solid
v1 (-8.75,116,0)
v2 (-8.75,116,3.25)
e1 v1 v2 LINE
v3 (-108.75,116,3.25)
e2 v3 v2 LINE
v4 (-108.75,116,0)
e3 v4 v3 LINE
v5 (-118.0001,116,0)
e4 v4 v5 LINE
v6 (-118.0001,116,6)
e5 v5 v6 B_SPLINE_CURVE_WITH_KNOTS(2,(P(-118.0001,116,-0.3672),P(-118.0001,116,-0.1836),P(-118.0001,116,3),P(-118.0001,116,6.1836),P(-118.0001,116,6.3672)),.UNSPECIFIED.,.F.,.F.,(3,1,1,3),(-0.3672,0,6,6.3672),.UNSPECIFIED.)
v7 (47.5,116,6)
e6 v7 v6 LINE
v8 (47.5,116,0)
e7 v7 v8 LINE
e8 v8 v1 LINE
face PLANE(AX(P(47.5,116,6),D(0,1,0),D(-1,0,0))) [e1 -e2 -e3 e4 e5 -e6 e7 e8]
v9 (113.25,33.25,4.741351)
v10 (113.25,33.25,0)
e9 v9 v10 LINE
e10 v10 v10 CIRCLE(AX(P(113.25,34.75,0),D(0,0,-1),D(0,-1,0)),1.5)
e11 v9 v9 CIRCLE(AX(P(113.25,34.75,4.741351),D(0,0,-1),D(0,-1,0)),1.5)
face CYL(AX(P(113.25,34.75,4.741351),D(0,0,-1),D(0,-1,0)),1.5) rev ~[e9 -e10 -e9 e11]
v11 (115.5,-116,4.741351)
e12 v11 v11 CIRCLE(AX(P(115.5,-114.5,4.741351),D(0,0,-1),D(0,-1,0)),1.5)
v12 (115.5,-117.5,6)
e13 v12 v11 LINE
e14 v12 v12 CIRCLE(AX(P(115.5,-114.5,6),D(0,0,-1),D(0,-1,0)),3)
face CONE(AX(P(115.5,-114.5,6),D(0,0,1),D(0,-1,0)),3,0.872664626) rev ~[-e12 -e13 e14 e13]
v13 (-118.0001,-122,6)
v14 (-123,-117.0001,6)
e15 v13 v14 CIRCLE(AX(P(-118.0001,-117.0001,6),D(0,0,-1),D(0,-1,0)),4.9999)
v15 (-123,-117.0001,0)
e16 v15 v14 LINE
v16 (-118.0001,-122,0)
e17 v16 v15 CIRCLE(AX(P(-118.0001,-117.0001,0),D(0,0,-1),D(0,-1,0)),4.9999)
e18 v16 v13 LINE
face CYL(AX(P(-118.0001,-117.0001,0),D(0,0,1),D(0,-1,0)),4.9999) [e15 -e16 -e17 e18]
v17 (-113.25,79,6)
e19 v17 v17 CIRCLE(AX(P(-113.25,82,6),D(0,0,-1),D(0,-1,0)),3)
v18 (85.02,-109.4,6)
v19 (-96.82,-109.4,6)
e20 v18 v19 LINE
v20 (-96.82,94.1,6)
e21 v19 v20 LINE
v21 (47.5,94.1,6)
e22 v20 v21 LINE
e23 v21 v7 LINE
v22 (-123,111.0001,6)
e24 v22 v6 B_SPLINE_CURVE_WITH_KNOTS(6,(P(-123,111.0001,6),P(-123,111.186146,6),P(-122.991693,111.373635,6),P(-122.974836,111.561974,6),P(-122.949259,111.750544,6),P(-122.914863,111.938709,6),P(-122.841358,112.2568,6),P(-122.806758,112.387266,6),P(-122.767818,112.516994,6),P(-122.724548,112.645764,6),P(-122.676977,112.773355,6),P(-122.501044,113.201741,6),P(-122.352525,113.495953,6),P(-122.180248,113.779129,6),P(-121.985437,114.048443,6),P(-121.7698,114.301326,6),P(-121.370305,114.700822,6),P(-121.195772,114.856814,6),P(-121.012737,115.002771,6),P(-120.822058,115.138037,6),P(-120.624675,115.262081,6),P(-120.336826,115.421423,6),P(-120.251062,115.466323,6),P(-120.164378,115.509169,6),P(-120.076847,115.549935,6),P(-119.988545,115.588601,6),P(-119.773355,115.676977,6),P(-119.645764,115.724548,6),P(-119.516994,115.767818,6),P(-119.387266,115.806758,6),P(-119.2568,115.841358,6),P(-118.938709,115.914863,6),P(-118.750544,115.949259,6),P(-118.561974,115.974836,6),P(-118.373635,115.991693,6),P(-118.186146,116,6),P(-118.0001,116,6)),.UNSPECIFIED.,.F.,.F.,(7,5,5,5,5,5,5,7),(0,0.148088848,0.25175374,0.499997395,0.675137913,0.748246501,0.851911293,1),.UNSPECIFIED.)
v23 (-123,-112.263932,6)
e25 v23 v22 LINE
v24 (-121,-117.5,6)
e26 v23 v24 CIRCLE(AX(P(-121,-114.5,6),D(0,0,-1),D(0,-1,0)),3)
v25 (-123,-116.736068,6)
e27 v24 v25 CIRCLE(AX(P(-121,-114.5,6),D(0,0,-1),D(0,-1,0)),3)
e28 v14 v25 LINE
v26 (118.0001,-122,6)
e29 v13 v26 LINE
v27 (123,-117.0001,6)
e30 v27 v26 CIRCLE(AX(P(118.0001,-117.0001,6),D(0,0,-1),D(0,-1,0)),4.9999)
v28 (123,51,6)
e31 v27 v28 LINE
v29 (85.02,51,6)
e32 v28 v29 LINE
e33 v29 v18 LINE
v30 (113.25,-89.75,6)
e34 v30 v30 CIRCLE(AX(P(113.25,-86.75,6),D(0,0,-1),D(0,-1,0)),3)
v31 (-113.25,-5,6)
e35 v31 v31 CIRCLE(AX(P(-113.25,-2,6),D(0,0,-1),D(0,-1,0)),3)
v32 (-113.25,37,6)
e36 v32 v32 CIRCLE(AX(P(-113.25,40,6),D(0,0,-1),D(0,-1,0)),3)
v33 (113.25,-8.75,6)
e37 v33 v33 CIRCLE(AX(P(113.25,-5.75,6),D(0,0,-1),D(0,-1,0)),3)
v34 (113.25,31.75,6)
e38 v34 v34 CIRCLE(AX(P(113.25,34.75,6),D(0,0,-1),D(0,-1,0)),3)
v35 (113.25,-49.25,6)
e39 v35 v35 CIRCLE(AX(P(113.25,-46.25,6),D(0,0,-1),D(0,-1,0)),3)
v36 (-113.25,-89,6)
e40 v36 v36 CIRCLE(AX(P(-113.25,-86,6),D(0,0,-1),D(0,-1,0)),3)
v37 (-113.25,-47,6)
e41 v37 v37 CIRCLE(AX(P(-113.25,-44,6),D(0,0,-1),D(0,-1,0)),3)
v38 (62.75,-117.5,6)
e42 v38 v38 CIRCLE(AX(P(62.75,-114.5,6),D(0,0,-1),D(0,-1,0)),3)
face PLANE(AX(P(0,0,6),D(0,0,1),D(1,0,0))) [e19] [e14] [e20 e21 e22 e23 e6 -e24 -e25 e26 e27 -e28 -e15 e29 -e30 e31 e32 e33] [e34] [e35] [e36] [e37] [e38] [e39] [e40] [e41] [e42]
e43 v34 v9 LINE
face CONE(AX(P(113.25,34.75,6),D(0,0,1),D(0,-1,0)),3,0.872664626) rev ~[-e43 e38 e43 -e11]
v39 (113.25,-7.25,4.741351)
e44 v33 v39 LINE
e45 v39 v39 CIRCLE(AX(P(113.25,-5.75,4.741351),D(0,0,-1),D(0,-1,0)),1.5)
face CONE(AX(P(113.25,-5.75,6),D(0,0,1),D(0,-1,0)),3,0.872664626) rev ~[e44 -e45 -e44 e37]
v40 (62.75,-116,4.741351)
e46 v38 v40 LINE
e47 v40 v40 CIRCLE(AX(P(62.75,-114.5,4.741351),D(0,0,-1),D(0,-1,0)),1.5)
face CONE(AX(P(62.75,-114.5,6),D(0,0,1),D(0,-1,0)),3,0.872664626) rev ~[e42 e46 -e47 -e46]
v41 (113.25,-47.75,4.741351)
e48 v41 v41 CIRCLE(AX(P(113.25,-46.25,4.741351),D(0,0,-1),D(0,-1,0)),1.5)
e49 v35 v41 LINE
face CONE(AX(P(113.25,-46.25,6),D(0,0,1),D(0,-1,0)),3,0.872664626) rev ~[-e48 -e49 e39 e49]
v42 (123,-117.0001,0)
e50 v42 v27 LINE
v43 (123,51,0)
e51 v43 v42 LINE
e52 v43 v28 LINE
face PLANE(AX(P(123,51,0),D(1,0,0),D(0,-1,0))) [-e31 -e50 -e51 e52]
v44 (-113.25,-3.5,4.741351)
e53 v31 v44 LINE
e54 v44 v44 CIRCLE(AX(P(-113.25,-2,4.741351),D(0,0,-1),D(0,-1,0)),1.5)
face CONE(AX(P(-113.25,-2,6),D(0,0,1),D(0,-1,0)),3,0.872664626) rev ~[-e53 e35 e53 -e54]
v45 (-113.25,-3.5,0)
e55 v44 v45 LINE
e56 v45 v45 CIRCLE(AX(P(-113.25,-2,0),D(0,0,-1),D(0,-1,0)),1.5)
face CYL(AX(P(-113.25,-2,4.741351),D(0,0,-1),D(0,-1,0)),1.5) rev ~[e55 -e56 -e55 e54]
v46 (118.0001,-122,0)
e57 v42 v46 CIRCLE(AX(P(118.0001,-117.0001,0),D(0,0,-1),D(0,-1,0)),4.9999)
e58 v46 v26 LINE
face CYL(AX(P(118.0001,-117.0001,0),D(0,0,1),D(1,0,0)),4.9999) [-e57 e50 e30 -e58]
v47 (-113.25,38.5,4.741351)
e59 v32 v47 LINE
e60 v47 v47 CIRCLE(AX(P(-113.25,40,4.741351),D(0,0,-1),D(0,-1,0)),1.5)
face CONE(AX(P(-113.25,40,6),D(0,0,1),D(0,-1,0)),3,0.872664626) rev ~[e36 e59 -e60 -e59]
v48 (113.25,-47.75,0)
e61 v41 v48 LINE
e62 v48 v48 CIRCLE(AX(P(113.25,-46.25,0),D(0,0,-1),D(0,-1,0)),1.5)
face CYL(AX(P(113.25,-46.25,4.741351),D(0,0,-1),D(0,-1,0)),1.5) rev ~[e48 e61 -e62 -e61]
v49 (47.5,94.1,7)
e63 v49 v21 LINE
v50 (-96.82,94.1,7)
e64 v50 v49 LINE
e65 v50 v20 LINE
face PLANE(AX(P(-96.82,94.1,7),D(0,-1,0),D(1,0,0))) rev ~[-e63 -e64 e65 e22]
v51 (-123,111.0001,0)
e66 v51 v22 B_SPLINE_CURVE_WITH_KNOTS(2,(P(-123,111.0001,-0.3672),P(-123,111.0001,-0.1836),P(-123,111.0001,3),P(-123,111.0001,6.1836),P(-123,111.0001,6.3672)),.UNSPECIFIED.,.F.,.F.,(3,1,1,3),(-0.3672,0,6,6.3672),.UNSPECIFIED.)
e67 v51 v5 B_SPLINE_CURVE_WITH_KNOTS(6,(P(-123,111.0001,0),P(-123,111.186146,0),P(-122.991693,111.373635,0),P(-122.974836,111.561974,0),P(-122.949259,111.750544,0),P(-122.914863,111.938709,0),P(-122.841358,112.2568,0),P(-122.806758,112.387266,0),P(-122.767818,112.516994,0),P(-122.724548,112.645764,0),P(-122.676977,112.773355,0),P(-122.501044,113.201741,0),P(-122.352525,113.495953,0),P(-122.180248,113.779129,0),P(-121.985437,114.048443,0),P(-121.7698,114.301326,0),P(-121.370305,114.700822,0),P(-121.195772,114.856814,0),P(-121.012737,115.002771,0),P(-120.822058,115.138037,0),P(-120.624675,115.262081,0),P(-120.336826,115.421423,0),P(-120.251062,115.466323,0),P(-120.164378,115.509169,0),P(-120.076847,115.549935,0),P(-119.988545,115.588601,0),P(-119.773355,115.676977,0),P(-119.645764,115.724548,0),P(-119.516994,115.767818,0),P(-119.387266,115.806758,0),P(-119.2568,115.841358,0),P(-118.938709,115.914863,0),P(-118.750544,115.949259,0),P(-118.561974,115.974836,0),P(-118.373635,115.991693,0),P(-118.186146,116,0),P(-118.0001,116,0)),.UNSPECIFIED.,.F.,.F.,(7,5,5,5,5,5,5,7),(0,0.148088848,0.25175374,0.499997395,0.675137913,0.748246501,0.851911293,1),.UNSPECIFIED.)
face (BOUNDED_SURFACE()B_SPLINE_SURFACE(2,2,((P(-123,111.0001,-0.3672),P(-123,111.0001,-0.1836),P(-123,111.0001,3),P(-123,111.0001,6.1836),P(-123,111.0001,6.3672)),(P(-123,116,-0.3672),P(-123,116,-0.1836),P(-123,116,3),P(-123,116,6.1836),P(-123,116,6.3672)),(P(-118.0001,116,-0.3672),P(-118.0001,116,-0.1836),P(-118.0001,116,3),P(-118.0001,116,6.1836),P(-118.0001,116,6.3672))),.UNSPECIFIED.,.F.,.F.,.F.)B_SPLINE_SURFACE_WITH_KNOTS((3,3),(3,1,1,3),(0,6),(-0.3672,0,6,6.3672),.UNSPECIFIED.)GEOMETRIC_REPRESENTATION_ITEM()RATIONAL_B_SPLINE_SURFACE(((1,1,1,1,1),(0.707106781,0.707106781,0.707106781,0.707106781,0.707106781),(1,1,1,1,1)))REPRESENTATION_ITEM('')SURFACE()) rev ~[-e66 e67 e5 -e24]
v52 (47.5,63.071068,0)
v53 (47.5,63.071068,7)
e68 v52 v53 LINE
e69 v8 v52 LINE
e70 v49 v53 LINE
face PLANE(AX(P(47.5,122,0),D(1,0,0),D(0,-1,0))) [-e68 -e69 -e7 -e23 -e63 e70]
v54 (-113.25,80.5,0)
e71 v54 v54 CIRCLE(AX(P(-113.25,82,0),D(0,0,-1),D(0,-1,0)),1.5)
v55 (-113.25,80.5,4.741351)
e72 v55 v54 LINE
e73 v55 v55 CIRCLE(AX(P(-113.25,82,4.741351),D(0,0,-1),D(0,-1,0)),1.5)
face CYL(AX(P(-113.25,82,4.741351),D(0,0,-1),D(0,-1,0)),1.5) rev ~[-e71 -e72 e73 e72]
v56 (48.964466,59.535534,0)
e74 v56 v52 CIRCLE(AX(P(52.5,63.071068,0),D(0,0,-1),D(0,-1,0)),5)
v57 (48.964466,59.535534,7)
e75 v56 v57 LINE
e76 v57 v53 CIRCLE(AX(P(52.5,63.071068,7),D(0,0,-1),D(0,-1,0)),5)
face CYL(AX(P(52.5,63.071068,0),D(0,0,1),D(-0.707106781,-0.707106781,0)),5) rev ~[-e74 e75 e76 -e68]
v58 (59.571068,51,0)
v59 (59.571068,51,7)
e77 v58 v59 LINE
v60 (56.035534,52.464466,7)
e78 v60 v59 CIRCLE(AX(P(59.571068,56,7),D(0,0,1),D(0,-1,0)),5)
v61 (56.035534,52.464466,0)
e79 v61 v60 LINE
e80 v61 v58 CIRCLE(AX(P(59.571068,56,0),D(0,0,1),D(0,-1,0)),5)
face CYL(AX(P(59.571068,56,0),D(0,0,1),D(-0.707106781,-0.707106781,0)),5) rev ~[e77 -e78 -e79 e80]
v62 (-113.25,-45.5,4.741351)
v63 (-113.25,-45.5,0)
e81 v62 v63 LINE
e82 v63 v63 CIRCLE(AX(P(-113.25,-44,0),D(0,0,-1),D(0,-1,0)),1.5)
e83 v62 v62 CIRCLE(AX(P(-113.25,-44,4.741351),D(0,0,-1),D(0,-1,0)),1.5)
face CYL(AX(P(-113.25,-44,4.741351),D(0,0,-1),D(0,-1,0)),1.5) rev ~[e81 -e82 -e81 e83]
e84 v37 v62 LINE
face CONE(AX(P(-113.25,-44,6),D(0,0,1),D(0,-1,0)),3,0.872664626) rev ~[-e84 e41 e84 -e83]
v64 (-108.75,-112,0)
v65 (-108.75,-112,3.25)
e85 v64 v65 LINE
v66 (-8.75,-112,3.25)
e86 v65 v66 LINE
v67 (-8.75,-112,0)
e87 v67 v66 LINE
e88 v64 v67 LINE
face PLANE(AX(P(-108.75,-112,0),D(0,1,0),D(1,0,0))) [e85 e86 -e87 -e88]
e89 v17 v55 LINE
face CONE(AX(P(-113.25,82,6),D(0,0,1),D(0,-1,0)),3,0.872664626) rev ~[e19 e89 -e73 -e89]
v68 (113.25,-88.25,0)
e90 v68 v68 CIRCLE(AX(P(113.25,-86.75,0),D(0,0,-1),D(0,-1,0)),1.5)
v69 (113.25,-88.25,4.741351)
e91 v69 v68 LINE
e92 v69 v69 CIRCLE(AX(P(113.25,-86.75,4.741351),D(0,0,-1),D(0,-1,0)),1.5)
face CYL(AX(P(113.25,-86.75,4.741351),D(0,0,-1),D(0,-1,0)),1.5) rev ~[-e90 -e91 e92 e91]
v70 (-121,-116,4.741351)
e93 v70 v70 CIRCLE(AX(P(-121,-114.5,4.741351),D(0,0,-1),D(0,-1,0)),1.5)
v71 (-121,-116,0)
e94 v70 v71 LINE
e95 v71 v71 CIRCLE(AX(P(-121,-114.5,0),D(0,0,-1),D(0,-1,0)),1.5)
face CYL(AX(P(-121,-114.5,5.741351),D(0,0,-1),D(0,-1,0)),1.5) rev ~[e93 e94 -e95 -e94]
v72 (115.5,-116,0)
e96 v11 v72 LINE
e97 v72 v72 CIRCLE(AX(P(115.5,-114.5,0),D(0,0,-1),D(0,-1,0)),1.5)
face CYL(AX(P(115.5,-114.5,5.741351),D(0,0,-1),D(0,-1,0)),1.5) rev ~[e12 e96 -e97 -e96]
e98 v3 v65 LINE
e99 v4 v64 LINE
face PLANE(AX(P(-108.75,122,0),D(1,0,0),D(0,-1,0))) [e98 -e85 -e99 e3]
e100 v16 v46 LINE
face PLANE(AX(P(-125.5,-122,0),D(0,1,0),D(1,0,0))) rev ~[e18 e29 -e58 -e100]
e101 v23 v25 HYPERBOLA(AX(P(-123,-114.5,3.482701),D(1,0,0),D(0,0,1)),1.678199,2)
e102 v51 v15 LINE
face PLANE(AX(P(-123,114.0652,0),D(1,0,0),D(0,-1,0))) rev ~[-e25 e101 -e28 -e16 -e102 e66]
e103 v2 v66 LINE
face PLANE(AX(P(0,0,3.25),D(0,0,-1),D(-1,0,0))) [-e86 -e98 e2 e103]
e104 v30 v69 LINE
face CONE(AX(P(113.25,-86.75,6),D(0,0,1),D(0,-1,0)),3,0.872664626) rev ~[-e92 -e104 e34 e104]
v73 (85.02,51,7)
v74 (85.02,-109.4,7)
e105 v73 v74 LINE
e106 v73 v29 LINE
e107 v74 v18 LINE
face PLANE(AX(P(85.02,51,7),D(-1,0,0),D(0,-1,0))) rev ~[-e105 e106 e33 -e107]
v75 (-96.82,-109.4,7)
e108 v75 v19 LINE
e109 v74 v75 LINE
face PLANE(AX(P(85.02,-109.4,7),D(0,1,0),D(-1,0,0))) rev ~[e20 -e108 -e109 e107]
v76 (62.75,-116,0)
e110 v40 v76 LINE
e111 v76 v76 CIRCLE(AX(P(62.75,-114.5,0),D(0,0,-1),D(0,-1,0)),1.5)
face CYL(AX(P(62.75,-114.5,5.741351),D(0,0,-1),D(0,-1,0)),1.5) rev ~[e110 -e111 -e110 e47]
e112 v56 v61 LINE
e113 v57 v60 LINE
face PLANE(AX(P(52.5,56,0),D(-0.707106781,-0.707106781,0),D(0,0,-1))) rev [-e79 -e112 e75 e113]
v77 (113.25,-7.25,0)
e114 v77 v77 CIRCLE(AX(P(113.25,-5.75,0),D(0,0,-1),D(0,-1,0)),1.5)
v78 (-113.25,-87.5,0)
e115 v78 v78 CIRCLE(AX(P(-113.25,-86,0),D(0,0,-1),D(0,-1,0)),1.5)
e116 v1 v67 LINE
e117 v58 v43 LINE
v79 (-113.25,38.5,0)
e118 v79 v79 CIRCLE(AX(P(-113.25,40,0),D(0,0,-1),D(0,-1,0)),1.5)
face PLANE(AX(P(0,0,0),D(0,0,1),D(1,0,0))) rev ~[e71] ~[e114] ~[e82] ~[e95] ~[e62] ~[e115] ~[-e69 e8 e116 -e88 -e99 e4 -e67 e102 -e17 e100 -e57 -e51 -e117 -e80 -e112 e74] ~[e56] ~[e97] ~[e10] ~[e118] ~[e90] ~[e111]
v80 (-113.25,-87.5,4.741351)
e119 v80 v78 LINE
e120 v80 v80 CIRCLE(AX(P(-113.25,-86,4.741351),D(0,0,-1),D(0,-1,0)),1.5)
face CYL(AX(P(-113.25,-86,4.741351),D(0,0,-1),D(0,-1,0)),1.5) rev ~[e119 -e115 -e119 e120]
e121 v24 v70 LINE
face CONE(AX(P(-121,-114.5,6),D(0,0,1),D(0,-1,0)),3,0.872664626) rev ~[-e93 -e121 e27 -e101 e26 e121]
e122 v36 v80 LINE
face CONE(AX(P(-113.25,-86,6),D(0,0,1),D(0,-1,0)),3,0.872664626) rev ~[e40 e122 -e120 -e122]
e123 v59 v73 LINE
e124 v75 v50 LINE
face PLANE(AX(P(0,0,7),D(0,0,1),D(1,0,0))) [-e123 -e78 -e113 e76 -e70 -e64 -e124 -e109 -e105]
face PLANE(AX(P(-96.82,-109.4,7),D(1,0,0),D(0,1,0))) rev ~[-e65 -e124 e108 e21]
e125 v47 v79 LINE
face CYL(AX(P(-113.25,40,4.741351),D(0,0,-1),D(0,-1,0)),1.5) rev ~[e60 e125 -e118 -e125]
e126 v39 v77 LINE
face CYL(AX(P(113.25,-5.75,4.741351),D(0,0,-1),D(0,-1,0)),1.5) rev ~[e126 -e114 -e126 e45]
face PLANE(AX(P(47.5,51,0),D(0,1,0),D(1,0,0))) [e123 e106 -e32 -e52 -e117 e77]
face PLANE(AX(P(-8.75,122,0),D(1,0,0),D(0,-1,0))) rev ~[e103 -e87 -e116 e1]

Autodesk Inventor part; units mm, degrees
ref_plane "YZ Plane" through (0, 0, 0) normal (1, 0, 0) x (0, 1, 0)
ref_plane "XZ Plane" through (0, 0, 0) normal (0, 1, 0) x (-1, 0, 0)
ref_plane "XY Plane" through (0, 0, 0) normal (0, 0, 1) x (1, 0, 0)
sketch "Sketch1" plane through (0, 0, 0) normal (0, 0, 1) x (1, 0, 0)
  line L0 (-125.5, -122) -> (125.5, -122)
  line L1 (125.5, -122) -> (125.5, 122)
  line L2 (125.5, 122) -> (-125.5, 122)
  line L3 (-125.5, 122) -> (-125.5, -122)
  line L4 (-125.5, -122) -> (125.5, 122) construction
  line L5 (125.5, -122) -> (-125.5, 122) construction
  line L6 (125.5, 122) -> (47.5, 122)
  line L7 (47.5, 122) -> (47.5, 51)
  line L8 (47.5, 51) -> (125.5, 51)
  line L9 (125.5, 51) -> (125.5, 122)
  point P0 (0, 0)
  point P1 (125.5, 51)
  dimension "d0" = 251
  dimension "d1" = 244
  dimension "d6" = 78
  dimension "d7" = 71
extrude "Extrusion1" add sketch "Sketch1" along normal blind 7 contours L3 L2 L7 L8 L1 L0
sketch "Sketch2" plane through (0, 0, 7) normal (0, 0, 1) x (1, 0, 0)
  line L0 (-100, -100) -> (100, -100)
  line L1 (100, -100) -> (100, 100)
  line L2 (100, 100) -> (-100, 100)
  line L3 (-100, 100) -> (-100, -100)
  line L4 (-100, -100) -> (100, 100) construction
  line L5 (100, -100) -> (-100, 100) construction
  point P0 (0, 0)
  point P1 (0, 0)
  dimension "d4" = 200
  dimension "d5" = 200
sketch "Sketch3" plane through (0, 0, 7) normal (0, 0, 1) x (1, 0, 0)
  line L0 (-85.5721, 144.9839) -> (-125.5, 112)
  line L1 (-125.5, 122) -> (-125.5, -122) projected
  line L2 (-85.5721, 144.9839) -> (-17.6358, 144.9839) construction
  line L3 (125.5, -122) -> (125.5, 51) projected
  line L4 (125.5, 51) -> (47.5, 51) projected
  line L5 (47.5, 51) -> (47.5, 122) projected
  line L6 (47.5, 122) -> (-125.5, 122) projected
  line L7 (-125.5, 122) -> (-125.5, -122) projected
  line L8 (-125.5, -122) -> (125.5, -122) projected
  point P0 (0, 0)
  point P1 (-113.3947, 122)
  point P2 (-125.5, 122)
  dimension "d9" = 140.44
  dimension "d10" = 10
extrude "Extrusion2" cut sketch "Sketch3" against normal blind 10 contours L0 L1 L6
fillet "Fillet1" radius 5 2 edges at (-113.3947, 122, 3.5) (-125.5, 112, 3.5)
chamfer "Chamfer1" distance 10 angle 45 1 edges at (47.5, 51, 3.5)
sketch "Sketch4" plane through (0, 0, 7) normal (0, 0, 1) x (1, 0, 0)
  line L0 (-125.5, 109.645) -> (-125.5, -122) projected
  line L1 (125.5, -122) -> (125.5, 51) projected
  line L2 (-125.5, -122) -> (125.5, -122) projected
  point P0 (0, 0)
  point P1 (-121, -114.5)
  point P2 (115.5, -114.5)
  point P3 (10, -114.5)
  point P4 (62.75, -114.5)
  dimension "d17" = 4.5
  dimension "d20" = 10
  dimension "d21" = 7.5
  dimension "d42" = 52.75
  dimension "d43" = 52.75
hole "Hole1" at (-121, -114.5, 7) at (115.5, -114.5, 7) at (62.75, -114.5, 7) direction (0, 0, -1) diameter 3 depth 15 countersink diameter 6 countersink angle 100
sketch "Sketch5" plane through (0, 0, 7) normal (0, 0, 1) x (1, 0, 0)
  line L0 (-96.82, 94.1) -> (85.02, 94.1)
  line L1 (85.02, 94.1) -> (85.02, -109.4)
  line L2 (85.02, -109.4) -> (-96.82, -109.4)
  line L3 (-96.82, -109.4) -> (-96.82, 94.1)
  line L4 (125.5, -122) -> (125.5, 51) projected
  line L5 (-125.5, 109.645) -> (-125.5, -122) projected
  line L6 (47.5, 122) -> (-111.5966, 122) projected
  line L7 (-125.5, -122) -> (125.5, -122) projected
  circle A0 centre (115.5, -114.5) radius 3 projected
  circle A1 centre (-121, -114.5) radius 3 projected
  arc A2 (-123.6844, 113.4998) -> (-125.5, 109.645) centre (-120.5, 109.645) ccw projected
  line L8 (-125.5, 109.645) -> (-125.5, -122) projected
  line L9 (-125.5, -122) -> (125.5, -122) projected
  line L10 (125.5, -122) -> (125.5, 51) projected
  line L11 (125.5, 51) -> (57.5, 51) projected
  line L12 (47.5, 61) -> (57.5, 51) projected
  line L13 (47.5, 61) -> (47.5, 122) projected
  line L14 (47.5, 122) -> (-111.5966, 122) projected
  arc A3 (-111.5966, 122) -> (-114.781, 120.8548) centre (-111.5966, 117) ccw projected
  line L15 (-114.781, 120.8548) -> (-123.6844, 113.4998) projected
  point P0 (0, 0)
  point P1 (47.5, 94.1)
  point P2 (-111.5966, 122)
  point P3 (85.02, 51)
  dimension "d29" = 40.48
  dimension "d30" = 28.68
  dimension "d31" = 27.9
  dimension "d32" = 12.6
extrude "Extrusion3" cut sketch "Sketch5" against normal blind 1 contours L3 L2 L1 L11 L4 L7 L5 A2 L15 A3 L6 L13 L0 | A0 | A1
sketch "Sketch6" plane through (0, 0, 6) normal (0, 0, 1) x (1, 0, 0)
  circle A0 centre (115.5, -114.5) radius 1.8082 projected
  circle A1 centre (-121, -114.5) radius 1.8082 projected
  line L0 (47.5, 94.1) -> (-96.82, 94.1) projected
  line L1 (47.5, 122) -> (47.5, 94.1) projected
  line L2 (-111.5966, 122) -> (47.5, 122) projected
  arc A2 (-111.5966, 122) -> (-114.781, 120.8548) centre (-111.5966, 117) ccw projected
  line L3 (-123.6844, 113.4998) -> (-114.781, 120.8548) projected
  arc A3 (-123.6844, 113.4998) -> (-125.5, 109.645) centre (-120.5, 109.645) ccw projected
  line L4 (-125.5, -122) -> (-125.5, 109.645) projected
  line L5 (125.5, -122) -> (-125.5, -122) projected
  line L6 (125.5, 51) -> (125.5, -122) projected
  line L7 (85.02, 51) -> (125.5, 51) projected
  line L8 (85.02, -109.4) -> (85.02, 51) projected
  line L9 (-96.82, -109.4) -> (85.02, -109.4) projected
  line L10 (-96.82, 94.1) -> (-96.82, -109.4) projected
  circle A4 centre (62.75, -114.5) radius 1.8082 projected
  circle A5 centre (115.5, -114.5) radius 1.8082 projected
  circle A6 centre (-121, -114.5) radius 1.8082 projected
  line L11 (47.5, 94.1) -> (-96.82, 94.1) projected
  line L12 (47.5, 122) -> (47.5, 94.1) projected
  line L13 (-111.5966, 122) -> (47.5, 122) projected
  arc A7 (-111.5966, 122) -> (-114.781, 120.8548) centre (-111.5966, 117) ccw projected
  line L14 (-123.6844, 113.4998) -> (-114.781, 120.8548) projected
  arc A8 (-123.6844, 113.4998) -> (-125.5, 109.645) centre (-120.5, 109.645) ccw projected
  line L15 (-125.5, -122) -> (-125.5, 109.645) projected
  line L16 (125.5, -122) -> (-125.5, -122) projected
  line L17 (125.5, 51) -> (125.5, -122) projected
  line L18 (85.02, 51) -> (125.5, 51) projected
  line L19 (85.02, -109.4) -> (85.02, 51) projected
  line L20 (-96.82, -109.4) -> (85.02, -109.4) projected
  line L21 (-96.82, 94.1) -> (-96.82, -109.4) projected
  point P0 (0, 0)
hole "Hole2" at (-121, -114.5, 6) at (115.5, -114.5, 6) at (62.75, -114.5, 6) direction (0, 0, -1) diameter 3 depth 15 countersink diameter 6 countersink angle 100
sketch "Sketch7" plane through (0, 0, 6) normal (0, 0, 1) x (1, 0, 0)
  circle A0 centre (62.75, -114.5) radius 3 projected
  circle A1 centre (115.5, -114.5) radius 3 projected
  circle A2 centre (-121, -114.5) radius 3 projected
  line L0 (47.5, 94.1) -> (-96.82, 94.1) projected
  line L1 (47.5, 122) -> (47.5, 94.1) projected
  line L2 (-111.5966, 122) -> (47.5, 122) projected
  arc A3 (-111.5966, 122) -> (-114.781, 120.8548) centre (-111.5966, 117) ccw projected
  line L3 (-123.6844, 113.4998) -> (-114.781, 120.8548) projected
  arc A4 (-123.6844, 113.4998) -> (-125.5, 109.645) centre (-120.5, 109.645) ccw projected
  line L4 (-125.5, -122) -> (-125.5, 109.645) projected
  line L5 (125.5, -122) -> (-125.5, -122) projected
  line L6 (125.5, 51) -> (125.5, -122) projected
  line L7 (85.02, 51) -> (125.5, 51) projected
  line L8 (85.02, -109.4) -> (85.02, 51) projected
  line L9 (-96.82, -109.4) -> (85.02, -109.4) projected
  line L10 (-96.82, 94.1) -> (-96.82, -109.4) projected
  point P0 (0, 0)
  point P1 (113.25, 34.75)
  point P2 (113.25, -5.75)
  point P3 (113.25, -46.25)
  point P4 (113.25, -86.75)
  point P5 (-113.25, -86)
  point P6 (-113.25, -44)
  point P7 (-113.25, -2)
  point P8 (-113.25, 40)
  point P9 (-113.25, 82)
  dimension "d44" = 12.25
  dimension "d45" = 35.25
  dimension "d46" = 40.5
  dimension "d47" = 40.5
  dimension "d48" = 40.5
  dimension "d56" = 36
  dimension "d57" = 42
  dimension "d58" = 42
  dimension "d59" = 42
  dimension "d60" = 42
  dimension "d61" = 12.25
hole "Hole3" at (113.25, 34.75, 6) at (113.25, -5.75, 6) at (113.25, -46.25, 6) at (113.25, -86.75, 6) at (-113.25, 82, 6) at (-113.25, 40, 6) at (-113.25, -2, 6) at (-113.25, -44, 6) at (-113.25, -86, 6) direction (0, 0, -1) diameter 3 depth 10 countersink diameter 6 countersink angle 100
sketch "Sketch8" plane through (0, 0, 0) normal (0, 0, -1) x (-1, 0, 0)
  circle A0 centre (113.25, -86) radius 1.5 projected
  circle A1 centre (113.25, -44) radius 1.5 projected
  circle A2 centre (113.25, -2) radius 1.5 projected
  circle A3 centre (113.25, 40) radius 1.5 projected
  circle A4 centre (113.25, 82) radius 1.5 projected
  circle A5 centre (-113.25, -86.75) radius 1.5 projected
  circle A6 centre (-113.25, -46.25) radius 1.5 projected
  circle A7 centre (-113.25, -5.75) radius 1.5 projected
  circle A8 centre (-113.25, 34.75) radius 1.5 projected
  circle A9 centre (-62.75, -114.5) radius 1.5 projected
  circle A10 centre (-115.5, -114.5) radius 1.5 projected
  circle A11 centre (121, -114.5) radius 1.5 projected
  arc A12 (125.5, 109.645) -> (123.6844, 113.4998) centre (120.5, 109.645) ccw projected
  line L0 (123.6844, 113.4998) -> (114.781, 120.8548) projected
  arc A13 (114.781, 120.8548) -> (111.5966, 122) centre (111.5966, 117) ccw projected
  line L1 (-47.5, 122) -> (111.5966, 122) projected
  line L2 (-47.5, 61) -> (-47.5, 122) projected
  line L3 (-57.5, 51) -> (-47.5, 61) projected
  line L4 (-125.5, 51) -> (-57.5, 51) projected
  line L5 (-125.5, -122) -> (-125.5, 51) projected
  line L6 (125.5, -122) -> (-125.5, -122) projected
  line L7 (125.5, 109.645) -> (125.5, -122) projected
  line L8 (108.75, 122) -> (108.75, -122)
  line L9 (8.75, 122) -> (8.75, -122)
  line L10 (108.75, -112) -> (8.75, -112)
  point P0 (0, 0)
  dimension "d62" = 4.5
  dimension "d63" = 100
  dimension "d66" = 10
extrude "Extrusion4" cut sketch "Sketch8" against normal blind 3.25 contours L10 L9 L1 L8
fillet "Fillet2" radius 5 2 edges at (47.5, 61, 3.5) (57.5, 51, 3.5)
sketch "Sketch9" plane through (0, 0, 6) normal (0, 0, 1) x (1, 0, 0)
  circle A0 centre (-113.25, -86) radius 3 projected
  circle A1 centre (-113.25, -44) radius 3 projected
  circle A2 centre (-113.25, -2) radius 3 projected
  circle A3 centre (-113.25, 40) radius 3 projected
  circle A4 centre (-113.25, 82) radius 3 projected
  circle A5 centre (113.25, -86.75) radius 3 projected
  circle A6 centre (113.25, -46.25) radius 3 projected
  circle A7 centre (113.25, -5.75) radius 3 projected
  circle A8 centre (113.25, 34.75) radius 3 projected
  circle A9 centre (62.75, -114.5) radius 3 projected
  circle A10 centre (115.5, -114.5) radius 3 projected
  circle A11 centre (-121, -114.5) radius 3 projected
  line L0 (47.5, 94.1) -> (-96.82, 94.1) projected
  line L1 (47.5, 122) -> (47.5, 94.1) projected
  line L2 (-111.5966, 122) -> (47.5, 122) projected
  arc A12 (-111.5966, 122) -> (-114.781, 120.8548) centre (-111.5966, 117) ccw projected
  line L3 (-123.6844, 113.4998) -> (-114.781, 120.8548) projected
  arc A13 (-123.6844, 113.4998) -> (-125.5, 109.645) centre (-120.5, 109.645) ccw projected
  line L4 (-125.5, -122) -> (-125.5, 109.645) projected
  line L5 (125.5, -122) -> (-125.5, -122) projected
  line L6 (125.5, 51) -> (125.5, -122) projected
  line L7 (85.02, 51) -> (125.5, 51) projected
  line L8 (85.02, -109.4) -> (85.02, 51) projected
  line L9 (-96.82, -109.4) -> (85.02, -109.4) projected
  line L10 (-96.82, 94.1) -> (-96.82, -109.4) projected
  line L11 (47.5, 116) -> (-120.6579, 116)
  point P0 (0, 0)
  dimension "d68" = 6
extrude "Extrusion5" cut sketch "Sketch9" against normal through all contours L11 L3 A12 L2 L1
fillet "Fillet3" radius 5 1 edges at (-120.6579, 116, 3)
sketch "Sketch10" plane through (0, 0, 0) normal (0, 0, -1) x (-1, 0, 0)
  arc A0 (122.0442, 114.8548) -> (118.8598, 116) centre (118.8598, 111) ccw projected
  line L0 (118.8598, 116) -> (108.75, 116) projected
  line L1 (108.75, 116) -> (108.75, -112) projected
  line L2 (108.75, -112) -> (8.75, -112) projected
  line L3 (8.75, -112) -> (8.75, 116) projected
  line L4 (8.75, 116) -> (-47.5, 116) projected
  line L5 (-47.5, 63.0711) -> (-47.5, 116) projected
  arc A1 (-48.9645, 59.5355) -> (-47.5, 63.0711) centre (-52.5, 63.0711) ccw projected
  line L6 (-56.0355, 52.4645) -> (-48.9645, 59.5355) projected
  arc A2 (-59.5711, 51) -> (-56.0355, 52.4645) centre (-59.5711, 56) ccw projected
  line L7 (-125.5, 51) -> (-59.5711, 51) projected
  line L8 (-125.5, -122) -> (-125.5, 51) projected
  line L9 (125.5, -122) -> (-125.5, -122) projected
  line L10 (125.5, 109.645) -> (125.5, -122) projected
  arc A3 (125.5, 109.645) -> (123.6844, 113.4998) centre (120.5, 109.645) ccw projected
  line L11 (123.6844, 113.4998) -> (122.0442, 114.8548) projected
  circle A4 centre (121, -114.5) radius 1.5 projected
  circle A5 centre (-115.5, -114.5) radius 1.5 projected
  circle A6 centre (-62.75, -114.5) radius 1.5 projected
  circle A7 centre (-113.25, 34.75) radius 1.5 projected
  circle A8 centre (-113.25, -5.75) radius 1.5 projected
  circle A9 centre (-113.25, -46.25) radius 1.5 projected
  circle A10 centre (-113.25, -86.75) radius 1.5 projected
  circle A11 centre (113.25, 82) radius 1.5 projected
  circle A12 centre (113.25, 40) radius 1.5 projected
  circle A13 centre (113.25, -2) radius 1.5 projected
  circle A14 centre (113.25, -44) radius 1.5 projected
  circle A15 centre (113.25, -86) radius 1.5 projected
  line L12 (-123, 51) -> (-123, -122)
  line L13 (123, 114.0652) -> (123, -122)
  point P0 (0, 0)
  dimension "d72" = 2.5
  dimension "d73" = 2.5
extrude "Extrusion6" cut sketch "Sketch10" against normal through all contours L11 A3 L10 L9 L13 | L9 L8 L7 L12
fillet "Fillet4" radius 5 3 edges at (-123, 114.0652, 3) (-123, -122, 3) (123, -122, 3)
equation "\"d43\" = d42"
equation "\"d47\" = d46"
equation "\"d48\" = d47"
equation "\"d58\" = d57"
equation "\"d59\" = d58"
equation "\"d60\" = d59"
equation "\"d61\" = d44"
equation "\"d73\" = d72"
properties part number "ElectronicsBase" material "ABS Plastic"
